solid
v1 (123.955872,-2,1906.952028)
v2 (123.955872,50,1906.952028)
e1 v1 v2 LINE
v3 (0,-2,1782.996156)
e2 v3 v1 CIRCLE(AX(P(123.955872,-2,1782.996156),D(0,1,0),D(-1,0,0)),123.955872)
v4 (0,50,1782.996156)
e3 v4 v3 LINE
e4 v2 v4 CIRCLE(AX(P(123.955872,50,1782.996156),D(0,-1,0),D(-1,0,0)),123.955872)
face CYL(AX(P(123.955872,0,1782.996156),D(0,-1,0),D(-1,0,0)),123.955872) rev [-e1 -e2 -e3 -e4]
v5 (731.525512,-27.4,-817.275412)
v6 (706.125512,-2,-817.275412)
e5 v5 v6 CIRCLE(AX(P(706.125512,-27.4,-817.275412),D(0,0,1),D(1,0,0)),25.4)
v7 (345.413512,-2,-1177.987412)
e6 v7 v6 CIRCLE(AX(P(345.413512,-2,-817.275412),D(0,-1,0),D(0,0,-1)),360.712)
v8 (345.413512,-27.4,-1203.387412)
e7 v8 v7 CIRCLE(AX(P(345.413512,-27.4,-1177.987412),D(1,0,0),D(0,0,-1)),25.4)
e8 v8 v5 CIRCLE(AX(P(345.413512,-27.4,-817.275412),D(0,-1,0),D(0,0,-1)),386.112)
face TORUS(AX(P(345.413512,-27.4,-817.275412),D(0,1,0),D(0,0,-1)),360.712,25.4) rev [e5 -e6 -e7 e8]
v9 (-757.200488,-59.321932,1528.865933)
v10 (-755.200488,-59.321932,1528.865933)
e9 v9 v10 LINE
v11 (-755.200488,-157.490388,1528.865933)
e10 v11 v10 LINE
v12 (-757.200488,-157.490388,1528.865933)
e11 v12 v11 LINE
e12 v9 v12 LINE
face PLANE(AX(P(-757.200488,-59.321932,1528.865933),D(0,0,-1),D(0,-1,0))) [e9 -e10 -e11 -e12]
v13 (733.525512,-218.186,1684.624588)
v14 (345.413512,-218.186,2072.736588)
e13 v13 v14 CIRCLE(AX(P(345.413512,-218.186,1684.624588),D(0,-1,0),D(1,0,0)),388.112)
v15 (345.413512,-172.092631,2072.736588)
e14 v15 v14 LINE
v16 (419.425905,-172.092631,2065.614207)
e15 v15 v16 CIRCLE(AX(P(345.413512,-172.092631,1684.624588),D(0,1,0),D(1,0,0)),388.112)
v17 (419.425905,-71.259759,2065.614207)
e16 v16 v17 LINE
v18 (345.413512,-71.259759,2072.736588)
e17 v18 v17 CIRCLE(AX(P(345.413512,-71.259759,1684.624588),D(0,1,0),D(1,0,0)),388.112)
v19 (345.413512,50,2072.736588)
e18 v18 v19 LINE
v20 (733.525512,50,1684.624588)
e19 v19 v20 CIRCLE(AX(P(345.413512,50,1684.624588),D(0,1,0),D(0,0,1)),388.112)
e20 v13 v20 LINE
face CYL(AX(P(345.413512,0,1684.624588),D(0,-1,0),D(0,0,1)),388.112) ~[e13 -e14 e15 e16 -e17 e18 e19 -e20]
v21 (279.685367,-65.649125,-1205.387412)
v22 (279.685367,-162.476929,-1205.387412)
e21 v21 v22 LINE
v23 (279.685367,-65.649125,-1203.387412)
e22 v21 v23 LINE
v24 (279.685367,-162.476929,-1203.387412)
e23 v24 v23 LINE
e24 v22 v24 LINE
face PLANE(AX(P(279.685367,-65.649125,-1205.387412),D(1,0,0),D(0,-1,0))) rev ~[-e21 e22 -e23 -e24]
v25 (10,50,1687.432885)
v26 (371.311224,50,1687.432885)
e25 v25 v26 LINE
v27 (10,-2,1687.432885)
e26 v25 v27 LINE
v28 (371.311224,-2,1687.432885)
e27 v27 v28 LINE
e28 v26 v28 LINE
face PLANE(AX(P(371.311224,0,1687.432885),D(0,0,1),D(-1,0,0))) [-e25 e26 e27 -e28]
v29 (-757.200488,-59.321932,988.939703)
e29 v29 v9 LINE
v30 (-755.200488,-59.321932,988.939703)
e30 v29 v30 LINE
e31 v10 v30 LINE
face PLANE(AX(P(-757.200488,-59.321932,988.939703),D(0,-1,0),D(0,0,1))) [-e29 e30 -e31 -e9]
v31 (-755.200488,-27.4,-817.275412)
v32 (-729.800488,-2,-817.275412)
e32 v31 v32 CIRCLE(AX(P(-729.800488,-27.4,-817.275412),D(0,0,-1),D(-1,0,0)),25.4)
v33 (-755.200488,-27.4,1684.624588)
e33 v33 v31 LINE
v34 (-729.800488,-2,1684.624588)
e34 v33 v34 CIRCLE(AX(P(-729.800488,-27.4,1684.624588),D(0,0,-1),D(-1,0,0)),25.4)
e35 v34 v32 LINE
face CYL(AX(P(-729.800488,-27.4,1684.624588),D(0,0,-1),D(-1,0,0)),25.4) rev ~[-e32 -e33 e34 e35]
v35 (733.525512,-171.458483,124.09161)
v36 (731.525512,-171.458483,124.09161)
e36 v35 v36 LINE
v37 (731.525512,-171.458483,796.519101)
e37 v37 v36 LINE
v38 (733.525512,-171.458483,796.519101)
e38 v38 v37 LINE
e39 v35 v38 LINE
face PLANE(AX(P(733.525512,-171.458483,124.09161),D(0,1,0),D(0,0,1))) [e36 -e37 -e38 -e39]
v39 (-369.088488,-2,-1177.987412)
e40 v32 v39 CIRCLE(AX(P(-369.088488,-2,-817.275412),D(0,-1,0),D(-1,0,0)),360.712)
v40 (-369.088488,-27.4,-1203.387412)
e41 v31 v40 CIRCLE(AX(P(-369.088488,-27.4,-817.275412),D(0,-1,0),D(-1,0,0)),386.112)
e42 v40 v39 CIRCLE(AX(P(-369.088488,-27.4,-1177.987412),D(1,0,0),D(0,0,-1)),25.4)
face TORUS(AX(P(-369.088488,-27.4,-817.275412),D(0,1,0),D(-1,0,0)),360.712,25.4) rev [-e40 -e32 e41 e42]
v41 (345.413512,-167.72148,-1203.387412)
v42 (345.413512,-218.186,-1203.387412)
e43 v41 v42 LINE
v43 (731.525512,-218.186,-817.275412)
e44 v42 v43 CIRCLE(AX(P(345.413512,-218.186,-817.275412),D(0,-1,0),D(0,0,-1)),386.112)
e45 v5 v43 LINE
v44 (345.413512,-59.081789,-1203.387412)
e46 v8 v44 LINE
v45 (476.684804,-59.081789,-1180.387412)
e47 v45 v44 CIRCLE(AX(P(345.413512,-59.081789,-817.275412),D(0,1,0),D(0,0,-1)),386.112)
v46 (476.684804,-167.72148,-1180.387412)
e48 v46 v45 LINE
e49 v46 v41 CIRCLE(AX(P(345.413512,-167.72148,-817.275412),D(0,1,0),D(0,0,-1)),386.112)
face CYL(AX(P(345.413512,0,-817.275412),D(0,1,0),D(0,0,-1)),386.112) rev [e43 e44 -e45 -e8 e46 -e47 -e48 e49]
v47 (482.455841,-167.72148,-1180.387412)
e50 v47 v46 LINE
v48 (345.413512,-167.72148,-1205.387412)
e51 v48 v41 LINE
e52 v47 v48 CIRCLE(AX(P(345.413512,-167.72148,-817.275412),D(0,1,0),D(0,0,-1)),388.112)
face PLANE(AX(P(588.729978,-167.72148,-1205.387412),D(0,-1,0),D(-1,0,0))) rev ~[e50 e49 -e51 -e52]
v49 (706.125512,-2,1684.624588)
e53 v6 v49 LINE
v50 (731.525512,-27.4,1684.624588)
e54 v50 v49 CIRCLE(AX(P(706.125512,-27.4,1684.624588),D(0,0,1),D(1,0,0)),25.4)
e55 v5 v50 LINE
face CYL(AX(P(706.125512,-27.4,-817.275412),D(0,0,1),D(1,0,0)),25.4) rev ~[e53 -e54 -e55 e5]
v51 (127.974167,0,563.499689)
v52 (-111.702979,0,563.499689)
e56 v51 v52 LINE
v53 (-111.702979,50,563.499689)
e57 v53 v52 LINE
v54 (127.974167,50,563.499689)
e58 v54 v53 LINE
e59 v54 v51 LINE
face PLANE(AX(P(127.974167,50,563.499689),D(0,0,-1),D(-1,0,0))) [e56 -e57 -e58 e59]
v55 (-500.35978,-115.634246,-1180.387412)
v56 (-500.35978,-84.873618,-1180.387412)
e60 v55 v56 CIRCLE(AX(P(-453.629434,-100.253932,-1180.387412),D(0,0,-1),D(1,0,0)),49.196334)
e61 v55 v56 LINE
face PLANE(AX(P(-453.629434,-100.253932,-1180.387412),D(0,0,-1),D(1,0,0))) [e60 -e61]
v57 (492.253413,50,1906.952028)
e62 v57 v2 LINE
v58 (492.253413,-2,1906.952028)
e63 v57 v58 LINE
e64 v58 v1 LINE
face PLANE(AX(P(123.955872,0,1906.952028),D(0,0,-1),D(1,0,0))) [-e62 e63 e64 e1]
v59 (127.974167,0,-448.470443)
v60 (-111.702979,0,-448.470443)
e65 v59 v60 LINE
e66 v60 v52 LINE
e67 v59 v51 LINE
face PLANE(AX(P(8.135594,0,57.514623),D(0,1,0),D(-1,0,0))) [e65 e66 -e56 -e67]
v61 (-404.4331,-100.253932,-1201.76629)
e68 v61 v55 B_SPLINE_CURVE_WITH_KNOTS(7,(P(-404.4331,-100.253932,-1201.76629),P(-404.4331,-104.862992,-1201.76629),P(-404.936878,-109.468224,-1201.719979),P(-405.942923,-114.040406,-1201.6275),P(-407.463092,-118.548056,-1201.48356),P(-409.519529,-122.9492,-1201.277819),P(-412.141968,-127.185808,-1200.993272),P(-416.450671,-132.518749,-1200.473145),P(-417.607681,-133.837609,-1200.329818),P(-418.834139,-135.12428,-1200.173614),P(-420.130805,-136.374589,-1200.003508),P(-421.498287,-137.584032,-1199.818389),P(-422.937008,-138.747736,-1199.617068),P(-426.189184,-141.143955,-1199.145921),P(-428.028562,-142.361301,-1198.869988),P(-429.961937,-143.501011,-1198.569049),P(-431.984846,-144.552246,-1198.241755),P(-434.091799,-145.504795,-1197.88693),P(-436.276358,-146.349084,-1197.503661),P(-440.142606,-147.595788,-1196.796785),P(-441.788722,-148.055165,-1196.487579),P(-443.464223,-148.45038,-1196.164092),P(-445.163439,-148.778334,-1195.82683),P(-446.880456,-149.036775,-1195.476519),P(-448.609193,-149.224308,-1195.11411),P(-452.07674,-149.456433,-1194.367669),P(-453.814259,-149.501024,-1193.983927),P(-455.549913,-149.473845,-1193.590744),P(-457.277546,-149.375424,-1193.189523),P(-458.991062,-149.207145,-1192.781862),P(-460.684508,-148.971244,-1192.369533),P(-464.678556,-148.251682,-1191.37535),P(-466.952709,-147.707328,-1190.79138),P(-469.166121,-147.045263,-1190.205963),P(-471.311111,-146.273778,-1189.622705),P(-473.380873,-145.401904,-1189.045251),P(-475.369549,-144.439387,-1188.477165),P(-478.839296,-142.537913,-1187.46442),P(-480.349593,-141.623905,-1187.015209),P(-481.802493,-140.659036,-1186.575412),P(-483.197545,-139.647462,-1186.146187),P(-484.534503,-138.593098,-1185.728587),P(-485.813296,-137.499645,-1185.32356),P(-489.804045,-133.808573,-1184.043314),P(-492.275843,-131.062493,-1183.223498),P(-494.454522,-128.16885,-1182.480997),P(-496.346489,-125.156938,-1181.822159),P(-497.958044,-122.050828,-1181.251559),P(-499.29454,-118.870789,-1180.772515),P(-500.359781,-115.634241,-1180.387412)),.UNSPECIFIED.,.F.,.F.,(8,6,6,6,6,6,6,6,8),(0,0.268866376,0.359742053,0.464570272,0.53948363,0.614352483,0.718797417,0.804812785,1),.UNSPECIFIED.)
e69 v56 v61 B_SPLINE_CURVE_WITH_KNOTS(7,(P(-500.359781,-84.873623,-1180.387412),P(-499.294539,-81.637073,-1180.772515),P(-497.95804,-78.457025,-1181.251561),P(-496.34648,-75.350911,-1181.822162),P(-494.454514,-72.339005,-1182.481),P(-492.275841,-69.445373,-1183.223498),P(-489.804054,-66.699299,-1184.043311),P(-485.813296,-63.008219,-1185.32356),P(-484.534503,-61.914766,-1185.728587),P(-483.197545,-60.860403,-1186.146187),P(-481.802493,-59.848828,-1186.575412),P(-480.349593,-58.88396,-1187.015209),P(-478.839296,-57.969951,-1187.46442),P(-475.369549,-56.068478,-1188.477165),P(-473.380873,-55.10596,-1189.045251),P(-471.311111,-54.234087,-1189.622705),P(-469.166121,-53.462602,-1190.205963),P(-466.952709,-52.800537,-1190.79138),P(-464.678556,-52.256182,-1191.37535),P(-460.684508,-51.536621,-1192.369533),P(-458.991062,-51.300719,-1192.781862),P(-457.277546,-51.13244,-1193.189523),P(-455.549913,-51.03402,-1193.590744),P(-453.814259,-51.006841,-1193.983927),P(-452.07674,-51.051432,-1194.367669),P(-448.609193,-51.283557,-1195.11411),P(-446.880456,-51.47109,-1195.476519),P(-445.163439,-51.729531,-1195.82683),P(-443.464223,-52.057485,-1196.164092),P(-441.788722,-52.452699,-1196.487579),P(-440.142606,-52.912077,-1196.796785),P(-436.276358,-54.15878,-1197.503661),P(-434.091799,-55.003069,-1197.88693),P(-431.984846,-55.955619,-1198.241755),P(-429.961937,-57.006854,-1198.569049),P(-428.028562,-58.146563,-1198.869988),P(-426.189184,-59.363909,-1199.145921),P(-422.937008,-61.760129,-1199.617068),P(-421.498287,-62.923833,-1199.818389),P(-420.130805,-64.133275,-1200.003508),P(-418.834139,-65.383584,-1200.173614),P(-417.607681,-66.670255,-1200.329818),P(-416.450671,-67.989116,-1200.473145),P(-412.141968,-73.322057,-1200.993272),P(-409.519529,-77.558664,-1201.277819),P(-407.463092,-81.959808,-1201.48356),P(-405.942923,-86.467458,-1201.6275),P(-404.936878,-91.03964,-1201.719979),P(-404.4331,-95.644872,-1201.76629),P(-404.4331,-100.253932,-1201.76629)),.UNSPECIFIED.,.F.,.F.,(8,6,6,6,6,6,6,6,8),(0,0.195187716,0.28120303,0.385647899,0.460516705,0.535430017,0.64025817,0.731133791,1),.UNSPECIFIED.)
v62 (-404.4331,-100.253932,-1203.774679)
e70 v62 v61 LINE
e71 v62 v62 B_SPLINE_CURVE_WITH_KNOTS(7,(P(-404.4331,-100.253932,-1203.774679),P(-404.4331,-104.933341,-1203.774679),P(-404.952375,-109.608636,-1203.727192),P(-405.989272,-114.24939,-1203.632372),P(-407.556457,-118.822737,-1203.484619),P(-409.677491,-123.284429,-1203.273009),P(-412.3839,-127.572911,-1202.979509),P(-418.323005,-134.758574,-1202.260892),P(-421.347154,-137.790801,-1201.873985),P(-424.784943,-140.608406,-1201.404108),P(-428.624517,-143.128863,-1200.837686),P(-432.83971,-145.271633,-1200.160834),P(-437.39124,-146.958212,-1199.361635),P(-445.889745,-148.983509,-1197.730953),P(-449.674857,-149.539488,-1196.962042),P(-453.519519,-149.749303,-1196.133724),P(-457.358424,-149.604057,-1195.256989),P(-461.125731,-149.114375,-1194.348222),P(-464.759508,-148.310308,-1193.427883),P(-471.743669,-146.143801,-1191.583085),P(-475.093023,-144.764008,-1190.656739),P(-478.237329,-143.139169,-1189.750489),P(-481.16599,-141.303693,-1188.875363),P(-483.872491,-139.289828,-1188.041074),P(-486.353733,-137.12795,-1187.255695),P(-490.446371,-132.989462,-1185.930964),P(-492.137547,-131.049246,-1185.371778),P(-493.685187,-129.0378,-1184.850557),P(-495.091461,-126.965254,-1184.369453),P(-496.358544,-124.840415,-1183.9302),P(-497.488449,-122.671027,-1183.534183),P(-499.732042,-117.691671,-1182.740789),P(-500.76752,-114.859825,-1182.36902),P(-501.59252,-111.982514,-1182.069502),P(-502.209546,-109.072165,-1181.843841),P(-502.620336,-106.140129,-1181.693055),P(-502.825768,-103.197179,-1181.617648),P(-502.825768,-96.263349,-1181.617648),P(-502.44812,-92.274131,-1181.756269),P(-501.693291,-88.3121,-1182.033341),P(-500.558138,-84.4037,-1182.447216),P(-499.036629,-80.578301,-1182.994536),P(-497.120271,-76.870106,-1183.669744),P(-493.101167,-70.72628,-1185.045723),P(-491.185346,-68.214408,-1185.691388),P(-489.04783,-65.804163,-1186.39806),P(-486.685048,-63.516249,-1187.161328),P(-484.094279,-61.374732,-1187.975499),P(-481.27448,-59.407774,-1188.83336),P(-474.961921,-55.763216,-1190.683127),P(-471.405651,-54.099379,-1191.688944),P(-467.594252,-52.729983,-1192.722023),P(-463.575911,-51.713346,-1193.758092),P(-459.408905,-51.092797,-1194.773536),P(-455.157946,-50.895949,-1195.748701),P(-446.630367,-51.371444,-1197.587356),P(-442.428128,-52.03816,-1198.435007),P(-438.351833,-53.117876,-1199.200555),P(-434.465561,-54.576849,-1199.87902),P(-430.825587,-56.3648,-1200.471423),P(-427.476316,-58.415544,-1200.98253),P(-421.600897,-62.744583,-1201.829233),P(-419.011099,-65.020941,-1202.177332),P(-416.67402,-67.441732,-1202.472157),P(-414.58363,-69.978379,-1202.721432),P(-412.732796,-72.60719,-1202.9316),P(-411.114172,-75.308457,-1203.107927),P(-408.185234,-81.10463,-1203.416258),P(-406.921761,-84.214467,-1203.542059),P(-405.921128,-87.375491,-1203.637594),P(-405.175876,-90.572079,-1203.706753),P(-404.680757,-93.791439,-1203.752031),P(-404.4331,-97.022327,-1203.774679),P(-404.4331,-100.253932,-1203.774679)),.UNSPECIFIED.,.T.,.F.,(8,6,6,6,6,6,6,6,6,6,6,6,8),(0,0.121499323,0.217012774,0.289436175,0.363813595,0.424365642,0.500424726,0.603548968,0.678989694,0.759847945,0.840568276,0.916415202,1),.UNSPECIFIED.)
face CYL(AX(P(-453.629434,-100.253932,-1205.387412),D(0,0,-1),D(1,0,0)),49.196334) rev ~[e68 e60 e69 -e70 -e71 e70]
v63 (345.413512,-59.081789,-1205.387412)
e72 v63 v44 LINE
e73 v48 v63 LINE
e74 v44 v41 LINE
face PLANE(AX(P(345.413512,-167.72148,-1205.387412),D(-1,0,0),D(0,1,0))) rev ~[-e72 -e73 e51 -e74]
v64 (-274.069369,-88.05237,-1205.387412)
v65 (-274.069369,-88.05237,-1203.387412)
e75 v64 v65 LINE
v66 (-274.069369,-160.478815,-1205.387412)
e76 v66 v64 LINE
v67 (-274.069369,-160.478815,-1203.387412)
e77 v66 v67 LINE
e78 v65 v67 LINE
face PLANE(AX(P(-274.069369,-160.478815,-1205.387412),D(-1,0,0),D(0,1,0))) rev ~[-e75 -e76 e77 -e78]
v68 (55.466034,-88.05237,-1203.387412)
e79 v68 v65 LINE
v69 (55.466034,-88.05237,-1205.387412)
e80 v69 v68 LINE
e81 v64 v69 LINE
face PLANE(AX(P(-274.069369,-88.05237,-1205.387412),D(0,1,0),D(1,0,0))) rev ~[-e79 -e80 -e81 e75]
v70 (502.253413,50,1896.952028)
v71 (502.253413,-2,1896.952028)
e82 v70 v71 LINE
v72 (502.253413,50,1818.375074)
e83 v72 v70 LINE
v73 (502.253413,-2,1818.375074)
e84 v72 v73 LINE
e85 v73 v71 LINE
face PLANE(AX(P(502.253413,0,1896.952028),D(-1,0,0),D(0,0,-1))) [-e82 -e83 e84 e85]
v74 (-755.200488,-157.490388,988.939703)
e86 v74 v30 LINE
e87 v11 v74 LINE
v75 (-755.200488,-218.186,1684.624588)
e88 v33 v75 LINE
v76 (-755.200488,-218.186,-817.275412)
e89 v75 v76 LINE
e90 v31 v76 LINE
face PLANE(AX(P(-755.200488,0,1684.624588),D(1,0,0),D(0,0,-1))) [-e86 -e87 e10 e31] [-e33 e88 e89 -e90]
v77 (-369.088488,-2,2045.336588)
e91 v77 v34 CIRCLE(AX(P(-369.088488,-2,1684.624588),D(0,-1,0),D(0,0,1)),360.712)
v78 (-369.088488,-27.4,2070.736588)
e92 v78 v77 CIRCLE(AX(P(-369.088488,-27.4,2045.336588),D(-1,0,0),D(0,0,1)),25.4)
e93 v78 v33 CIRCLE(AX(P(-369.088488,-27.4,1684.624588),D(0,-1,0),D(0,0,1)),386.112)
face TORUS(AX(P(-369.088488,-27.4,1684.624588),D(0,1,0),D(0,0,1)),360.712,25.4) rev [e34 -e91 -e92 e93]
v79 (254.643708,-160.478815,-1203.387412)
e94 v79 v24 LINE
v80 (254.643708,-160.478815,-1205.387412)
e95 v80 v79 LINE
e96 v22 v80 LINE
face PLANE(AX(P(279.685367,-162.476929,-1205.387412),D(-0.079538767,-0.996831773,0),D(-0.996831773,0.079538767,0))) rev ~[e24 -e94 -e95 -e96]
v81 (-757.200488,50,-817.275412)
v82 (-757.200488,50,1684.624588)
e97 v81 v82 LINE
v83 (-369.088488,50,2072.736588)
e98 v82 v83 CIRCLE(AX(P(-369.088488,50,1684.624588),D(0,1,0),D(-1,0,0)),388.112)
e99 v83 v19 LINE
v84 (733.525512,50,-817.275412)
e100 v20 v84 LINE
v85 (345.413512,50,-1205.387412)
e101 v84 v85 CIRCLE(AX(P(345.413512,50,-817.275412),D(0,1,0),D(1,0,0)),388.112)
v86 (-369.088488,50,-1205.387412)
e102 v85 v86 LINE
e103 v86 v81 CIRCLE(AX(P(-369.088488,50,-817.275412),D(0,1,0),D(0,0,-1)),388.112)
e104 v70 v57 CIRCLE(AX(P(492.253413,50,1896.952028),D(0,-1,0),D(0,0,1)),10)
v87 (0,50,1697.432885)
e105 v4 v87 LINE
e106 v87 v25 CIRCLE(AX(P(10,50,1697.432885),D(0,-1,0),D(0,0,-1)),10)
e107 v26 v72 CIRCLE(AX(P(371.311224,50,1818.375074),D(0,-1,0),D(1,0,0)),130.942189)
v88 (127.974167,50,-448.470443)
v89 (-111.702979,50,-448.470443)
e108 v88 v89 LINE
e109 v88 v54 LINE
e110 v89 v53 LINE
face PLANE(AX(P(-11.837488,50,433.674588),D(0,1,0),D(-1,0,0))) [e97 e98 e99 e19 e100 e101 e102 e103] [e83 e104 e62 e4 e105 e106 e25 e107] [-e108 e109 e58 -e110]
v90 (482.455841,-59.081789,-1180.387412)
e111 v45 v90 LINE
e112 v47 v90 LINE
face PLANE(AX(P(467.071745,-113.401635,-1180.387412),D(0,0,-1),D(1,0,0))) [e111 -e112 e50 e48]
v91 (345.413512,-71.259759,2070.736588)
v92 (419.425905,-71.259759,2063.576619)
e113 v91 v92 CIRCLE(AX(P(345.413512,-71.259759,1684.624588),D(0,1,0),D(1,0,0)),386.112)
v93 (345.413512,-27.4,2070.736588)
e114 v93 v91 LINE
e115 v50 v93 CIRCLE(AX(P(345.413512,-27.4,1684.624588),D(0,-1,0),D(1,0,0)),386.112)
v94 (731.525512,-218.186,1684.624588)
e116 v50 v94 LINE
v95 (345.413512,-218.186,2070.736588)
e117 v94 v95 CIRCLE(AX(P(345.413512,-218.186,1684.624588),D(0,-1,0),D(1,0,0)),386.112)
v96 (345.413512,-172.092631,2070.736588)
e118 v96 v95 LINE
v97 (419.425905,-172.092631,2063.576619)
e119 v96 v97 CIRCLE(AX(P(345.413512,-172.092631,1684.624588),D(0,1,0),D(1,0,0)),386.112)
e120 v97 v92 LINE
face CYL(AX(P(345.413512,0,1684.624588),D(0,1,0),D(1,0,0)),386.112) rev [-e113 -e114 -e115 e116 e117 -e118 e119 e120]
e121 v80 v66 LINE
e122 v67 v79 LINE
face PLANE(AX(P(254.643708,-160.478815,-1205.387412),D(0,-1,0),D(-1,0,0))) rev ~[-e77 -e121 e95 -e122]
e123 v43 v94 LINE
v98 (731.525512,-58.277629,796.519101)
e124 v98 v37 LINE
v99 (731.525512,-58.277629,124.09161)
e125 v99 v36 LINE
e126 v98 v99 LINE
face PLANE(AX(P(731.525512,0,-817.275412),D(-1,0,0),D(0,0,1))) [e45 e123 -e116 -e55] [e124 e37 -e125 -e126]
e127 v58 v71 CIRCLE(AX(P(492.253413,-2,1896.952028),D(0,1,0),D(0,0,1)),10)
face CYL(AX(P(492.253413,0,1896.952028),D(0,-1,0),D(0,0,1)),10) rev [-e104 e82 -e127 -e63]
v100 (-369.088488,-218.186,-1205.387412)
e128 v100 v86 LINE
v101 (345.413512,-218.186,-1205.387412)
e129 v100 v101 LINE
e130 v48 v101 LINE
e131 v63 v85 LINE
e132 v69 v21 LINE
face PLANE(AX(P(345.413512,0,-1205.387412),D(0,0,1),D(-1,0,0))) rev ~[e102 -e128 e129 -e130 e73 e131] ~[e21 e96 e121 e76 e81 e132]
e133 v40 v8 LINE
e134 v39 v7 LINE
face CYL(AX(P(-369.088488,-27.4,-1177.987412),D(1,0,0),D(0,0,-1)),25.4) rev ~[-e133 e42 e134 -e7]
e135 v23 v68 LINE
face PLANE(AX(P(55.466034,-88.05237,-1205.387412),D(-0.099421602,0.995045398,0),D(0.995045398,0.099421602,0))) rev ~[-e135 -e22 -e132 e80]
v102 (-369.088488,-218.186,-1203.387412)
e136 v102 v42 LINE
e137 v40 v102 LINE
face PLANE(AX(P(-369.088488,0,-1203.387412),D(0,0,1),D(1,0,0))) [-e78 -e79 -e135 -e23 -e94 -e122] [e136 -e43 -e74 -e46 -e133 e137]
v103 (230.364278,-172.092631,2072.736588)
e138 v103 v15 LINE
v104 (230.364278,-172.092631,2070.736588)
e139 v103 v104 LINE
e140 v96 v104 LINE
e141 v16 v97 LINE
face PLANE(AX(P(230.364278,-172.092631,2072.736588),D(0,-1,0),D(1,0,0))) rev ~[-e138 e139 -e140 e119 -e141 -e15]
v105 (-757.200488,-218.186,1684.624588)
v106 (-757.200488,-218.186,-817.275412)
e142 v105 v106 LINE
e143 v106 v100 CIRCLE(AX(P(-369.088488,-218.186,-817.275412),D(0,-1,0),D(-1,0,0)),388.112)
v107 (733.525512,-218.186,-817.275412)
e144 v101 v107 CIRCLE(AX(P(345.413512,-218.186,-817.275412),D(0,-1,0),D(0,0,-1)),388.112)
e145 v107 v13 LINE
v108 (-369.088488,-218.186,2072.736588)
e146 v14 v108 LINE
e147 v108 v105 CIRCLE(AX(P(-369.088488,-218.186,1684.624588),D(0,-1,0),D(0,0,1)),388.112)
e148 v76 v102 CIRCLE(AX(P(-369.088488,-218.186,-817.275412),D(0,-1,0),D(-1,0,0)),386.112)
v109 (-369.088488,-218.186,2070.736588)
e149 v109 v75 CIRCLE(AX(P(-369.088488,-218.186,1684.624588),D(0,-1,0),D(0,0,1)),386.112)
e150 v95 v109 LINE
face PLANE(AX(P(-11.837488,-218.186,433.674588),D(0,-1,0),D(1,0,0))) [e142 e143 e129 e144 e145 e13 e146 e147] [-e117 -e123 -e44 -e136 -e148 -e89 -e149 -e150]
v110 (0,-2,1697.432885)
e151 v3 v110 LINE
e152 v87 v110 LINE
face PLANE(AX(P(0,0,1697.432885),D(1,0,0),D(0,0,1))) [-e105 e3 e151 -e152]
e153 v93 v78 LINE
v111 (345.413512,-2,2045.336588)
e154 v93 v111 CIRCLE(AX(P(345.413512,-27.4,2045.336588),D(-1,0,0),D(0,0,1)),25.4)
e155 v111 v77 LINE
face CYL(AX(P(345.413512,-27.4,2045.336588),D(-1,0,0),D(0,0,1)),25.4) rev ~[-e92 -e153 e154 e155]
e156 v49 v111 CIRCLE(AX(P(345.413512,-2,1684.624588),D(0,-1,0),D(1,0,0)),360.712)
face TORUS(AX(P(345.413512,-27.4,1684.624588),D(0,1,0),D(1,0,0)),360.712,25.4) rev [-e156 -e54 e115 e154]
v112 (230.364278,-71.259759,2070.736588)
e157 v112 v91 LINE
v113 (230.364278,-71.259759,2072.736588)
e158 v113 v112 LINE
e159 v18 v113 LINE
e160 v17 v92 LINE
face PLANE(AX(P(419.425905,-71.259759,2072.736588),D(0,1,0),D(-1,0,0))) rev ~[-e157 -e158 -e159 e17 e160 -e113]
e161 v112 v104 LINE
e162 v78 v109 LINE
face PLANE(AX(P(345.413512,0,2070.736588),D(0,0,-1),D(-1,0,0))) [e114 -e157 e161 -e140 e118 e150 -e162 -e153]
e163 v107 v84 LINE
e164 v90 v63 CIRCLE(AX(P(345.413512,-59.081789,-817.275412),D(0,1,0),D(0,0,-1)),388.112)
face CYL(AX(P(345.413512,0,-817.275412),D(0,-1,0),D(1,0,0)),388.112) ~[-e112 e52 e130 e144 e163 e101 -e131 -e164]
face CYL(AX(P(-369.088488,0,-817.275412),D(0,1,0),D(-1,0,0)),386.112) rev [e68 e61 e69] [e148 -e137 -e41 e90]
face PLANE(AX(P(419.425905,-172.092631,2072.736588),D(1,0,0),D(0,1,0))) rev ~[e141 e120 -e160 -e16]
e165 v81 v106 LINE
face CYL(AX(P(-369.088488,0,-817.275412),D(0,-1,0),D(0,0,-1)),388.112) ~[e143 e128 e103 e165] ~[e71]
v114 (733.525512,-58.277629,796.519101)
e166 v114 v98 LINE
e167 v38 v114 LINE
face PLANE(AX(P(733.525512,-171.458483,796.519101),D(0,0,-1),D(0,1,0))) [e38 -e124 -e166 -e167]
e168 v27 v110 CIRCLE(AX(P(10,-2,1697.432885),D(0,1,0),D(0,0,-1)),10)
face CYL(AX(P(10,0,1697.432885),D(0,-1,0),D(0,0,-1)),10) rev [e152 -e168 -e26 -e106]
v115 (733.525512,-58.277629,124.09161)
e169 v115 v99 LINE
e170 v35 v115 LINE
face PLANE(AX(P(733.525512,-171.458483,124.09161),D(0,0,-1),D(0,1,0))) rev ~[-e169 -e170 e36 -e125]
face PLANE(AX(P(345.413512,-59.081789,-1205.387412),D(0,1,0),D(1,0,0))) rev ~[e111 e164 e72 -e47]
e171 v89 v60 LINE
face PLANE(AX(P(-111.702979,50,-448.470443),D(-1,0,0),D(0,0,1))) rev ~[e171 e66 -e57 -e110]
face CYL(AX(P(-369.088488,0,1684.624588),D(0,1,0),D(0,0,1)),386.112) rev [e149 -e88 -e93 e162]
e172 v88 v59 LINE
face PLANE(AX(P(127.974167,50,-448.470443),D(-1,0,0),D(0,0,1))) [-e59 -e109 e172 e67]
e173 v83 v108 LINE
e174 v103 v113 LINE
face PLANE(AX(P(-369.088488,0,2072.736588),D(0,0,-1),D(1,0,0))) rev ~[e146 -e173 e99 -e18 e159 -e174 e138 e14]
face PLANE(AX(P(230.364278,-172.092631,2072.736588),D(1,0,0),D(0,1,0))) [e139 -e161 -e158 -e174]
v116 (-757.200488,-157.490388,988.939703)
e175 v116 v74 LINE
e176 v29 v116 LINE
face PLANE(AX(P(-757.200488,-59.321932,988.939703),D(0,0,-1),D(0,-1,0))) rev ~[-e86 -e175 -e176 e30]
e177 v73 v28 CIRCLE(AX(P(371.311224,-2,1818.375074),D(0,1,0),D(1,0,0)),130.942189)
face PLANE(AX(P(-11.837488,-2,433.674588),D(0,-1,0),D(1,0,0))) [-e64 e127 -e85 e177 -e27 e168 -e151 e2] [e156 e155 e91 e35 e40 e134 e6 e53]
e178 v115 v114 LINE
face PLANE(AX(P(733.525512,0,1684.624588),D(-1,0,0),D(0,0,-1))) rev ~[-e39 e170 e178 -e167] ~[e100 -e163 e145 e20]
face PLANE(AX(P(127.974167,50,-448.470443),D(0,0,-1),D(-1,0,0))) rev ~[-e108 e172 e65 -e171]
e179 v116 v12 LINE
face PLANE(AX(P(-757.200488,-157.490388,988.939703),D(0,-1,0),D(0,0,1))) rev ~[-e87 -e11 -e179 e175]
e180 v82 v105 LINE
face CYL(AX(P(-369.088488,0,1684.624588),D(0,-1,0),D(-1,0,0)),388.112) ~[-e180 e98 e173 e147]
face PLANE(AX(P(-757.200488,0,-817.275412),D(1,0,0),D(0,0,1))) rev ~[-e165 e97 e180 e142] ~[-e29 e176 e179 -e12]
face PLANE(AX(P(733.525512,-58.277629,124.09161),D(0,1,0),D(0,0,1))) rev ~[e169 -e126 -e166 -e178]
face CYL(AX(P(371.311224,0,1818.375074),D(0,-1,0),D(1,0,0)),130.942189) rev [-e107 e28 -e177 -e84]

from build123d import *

# Parameters (mm, degrees)
F1_DEPTH  = 218.186
F2_T      = -2
F3_R      = 25.4
F4_W      = 98.1684550643
F4_H      = 539.9262309074
F5_DEPTH  = 25
F6_W      = 115.0492340008
F6_H      = 100.8328720927
F6_W_2    = 74.0123927912
F7_DEPTH  = 25
F8_R      = 49.1963337308
F9_DEPTH  = 25
F10_W     = 113.1808534265
F10_H     = 672.4274903536
F11_DEPTH = 25
F14_DEPTH = 25
F15_DEPTH = 50
F16_DEPTH = 115
F17_W     = 239.6771460772
F17_H     = 1011.9701325893
F18_DEPTH = 50


# Not quite as in the source:
# - a feature names something its author has since deleted; it is built from what else it names


with BuildPart() as f1:
    # F0 (on Front) → F1 (new body)
    with BuildSketch(Plane.XZ):
        with BuildLine():
            Line((345.4135119597, 2072.7365876565), (-369.0884880403, 2072.7365876565))
            ThreePointArc((-369.0884880403, 2072.7365876565), (-643.5251151002, 1959.0612147164), (-757.2004880403, 1684.6245876565))
            Line((-757.2004880403, 1684.6245876565), (-757.2004880403, -817.2754123435))
            ThreePointArc((-757.2004880403, -817.2754123435), (-643.5251151002, -1091.7120394034), (-369.0884880403, -1205.3874123435))
            Line((-369.0884880403, -1205.3874123435), (345.4135119597, -1205.3874123435))
            ThreePointArc((345.4135119597, -1205.3874123435), (619.8501390195, -1091.7120394034), (733.5255119597, -817.2754123435))
            Line((733.5255119597, -817.2754123435), (733.5255119597, 1684.6245876565))
            ThreePointArc((733.5255119597, 1684.6245876565), (619.8501390195, 1959.0612147164), (345.4135119597, 2072.7365876565))
        make_face()
    extrude(amount=F1_DEPTH)

    # F2
    f2_openings = [f1.faces().sort_by_distance(p)[0] for p in [
        (-11.837488, -218.186, 433.674588),
    ]]
    offset(amount=F2_T, openings=f2_openings)

    # F3
    f3_edges = [f1.edges().sort_by_distance(p)[0] for p in [
        (731.525512, -2, 433.674588),
    ]]
    fillet(f3_edges, radius=F3_R)

    # F4 (on face) → F5 (cut)
    with BuildSketch(Plane(origin=(-757.2004880403, 0, 0), x_dir=(0, -1, 0), z_dir=(-1, 0, 0))):
        with Locations((108.4061600268, 1258.9028179646)):
            Rectangle(F4_W, F4_H)
    extrude(amount=-F5_DEPTH, mode=Mode.SUBTRACT)

    # F6 (on face) → F7 (cut)
    with BuildSketch(Plane.XY.offset(2072.7365876565)):
        with Locations((287.8888949593, -121.6761954129)):
            Rectangle(F6_W, F6_H)
        with Locations((382.4197083552, -121.6761954129)):
            Rectangle(F6_W_2, F6_H)
    extrude(amount=-F7_DEPTH, mode=Mode.SUBTRACT)

    # F8 (on face) → F9 (cut)
    with BuildSketch(Plane(origin=(0, 0, -1205.3874123435), x_dir=(1, 0, 0), z_dir=(0, 0, -1))):
        Polygon((254.6437084675, 88.0523696542), (55.4660335183, 88.0523696542), (256.1990016318, 67.995804056), align=None)
        Polygon((254.6437084675, 160.4788154364), (-274.0693688393, 160.4788154364), (-274.0693688393, 88.0523696542), (55.4660335183, 88.0523696542), (254.6437084675, 88.0523696542), align=None)
        Polygon((279.685367193, 162.4769285816), (254.6437084675, 160.4788154364), (254.6437084675, 88.0523696542), (256.1990016318, 67.995804056), (279.685367193, 65.6491251025), align=None)
        Polygon((439.4082129002, 167.7214801311), (345.4135119597, 167.7214801311), (345.4135119597, 59.0817891061), (439.4082129002, 59.0817891061), (588.7299776077, 59.0817891061), (588.7299776077, 167.7214801311), align=None)
        with Locations((-453.6294341087, 100.253932178)):
            Circle(F8_R)
    extrude(amount=-F9_DEPTH, mode=Mode.SUBTRACT)

    # F10 (on face) → F11 (cut)
    with BuildSketch(Plane.YZ.offset(733.5255119597)):
        with Locations((-114.8680560291, 460.3053554893)):
            Rectangle(F10_W, F10_H)
    extrude(amount=-F11_DEPTH, mode=Mode.SUBTRACT)

    # F13 (on face) → F14 (cut)
    with BuildSketch(Plane(origin=(0, 0, 0), x_dir=(-1, 0, 0), z_dir=(0, 1, 0))):
        with BuildLine():
            Line((-123.95587248, 1906.9520282745), (-492.2534132004, 1906.9520282745))
            ThreePointArc((-492.2534132004, 1906.9520282745), (-499.3244810122, 1904.0230960864), (-502.2534132004, 1896.9520282745))
            Line((-502.2534132004, 1896.9520282745), (-502.2534132004, 1818.3750739625))
            ThreePointArc((-502.2534132004, 1818.3750739625), (-463.9013340465, 1725.7849643239), (-371.3112244078, 1687.43288517))
            Line((-371.3112244078, 1687.43288517), (-10, 1687.43288517))
            ThreePointArc((-10, 1687.43288517), (-2.9289321881, 1690.3618173581), (0, 1697.43288517))
            Line((0, 1697.43288517), (0, 1782.9961557945))
            ThreePointArc((0, 1782.9961557945), (-36.3058344815, 1870.646193793), (-123.95587248, 1906.9520282745))
        make_face()
    extrude(amount=-F14_DEPTH, mode=Mode.SUBTRACT)

    # F12 (on face) → F15 (join)
    with BuildSketch(Plane(origin=(0, 0, 0), x_dir=(-1, 0, 0), z_dir=(0, 1, 0))):
        with BuildLine():
            Line((369.0884880403, 2072.7365876565), (-345.4135119597, 2072.7365876565))
            ThreePointArc((-345.4135119597, 2072.7365876565), (-619.8501390195, 1959.0612147164), (-733.5255119597, 1684.6245876565))
            Line((-733.5255119597, 1684.6245876565), (-733.5255119597, -817.2754123435))
            ThreePointArc((-733.5255119597, -817.2754123435), (-619.8501390195, -1091.7120394034), (-345.4135119597, -1205.3874123435))
            Line((-345.4135119597, -1205.3874123435), (369.0884880403, -1205.3874123435))
            ThreePointArc((369.0884880403, -1205.3874123435), (643.5251151002, -1091.7120394034), (757.2004880403, -817.2754123435))
            Line((757.2004880403, -817.2754123435), (757.2004880403, 1684.6245876565))
            ThreePointArc((757.2004880403, 1684.6245876565), (643.5251151002, 1959.0612147164), (369.0884880403, 2072.7365876565))
        make_face()
    extrude(amount=F15_DEPTH)

    # F16 (cut): a face of the model
    f16_faces = [f1.faces().sort_by_distance(p)[0] for p in [
        (250.3551806522, 0, 1797.440656852),
    ]]
    extrude(f16_faces, amount=-F16_DEPTH, mode=Mode.SUBTRACT)

    # F17 (on face) → F18 (cut)
    with BuildSketch(Plane(origin=(0, 50, 0), x_dir=(-1, 0, 0), z_dir=(0, 1, 0))):
        with Locations((-8.1355944276, 57.5146228075)):
            Rectangle(F17_W, F17_H)
    extrude(amount=-F18_DEPTH, mode=Mode.SUBTRACT)


solid = f1.part
